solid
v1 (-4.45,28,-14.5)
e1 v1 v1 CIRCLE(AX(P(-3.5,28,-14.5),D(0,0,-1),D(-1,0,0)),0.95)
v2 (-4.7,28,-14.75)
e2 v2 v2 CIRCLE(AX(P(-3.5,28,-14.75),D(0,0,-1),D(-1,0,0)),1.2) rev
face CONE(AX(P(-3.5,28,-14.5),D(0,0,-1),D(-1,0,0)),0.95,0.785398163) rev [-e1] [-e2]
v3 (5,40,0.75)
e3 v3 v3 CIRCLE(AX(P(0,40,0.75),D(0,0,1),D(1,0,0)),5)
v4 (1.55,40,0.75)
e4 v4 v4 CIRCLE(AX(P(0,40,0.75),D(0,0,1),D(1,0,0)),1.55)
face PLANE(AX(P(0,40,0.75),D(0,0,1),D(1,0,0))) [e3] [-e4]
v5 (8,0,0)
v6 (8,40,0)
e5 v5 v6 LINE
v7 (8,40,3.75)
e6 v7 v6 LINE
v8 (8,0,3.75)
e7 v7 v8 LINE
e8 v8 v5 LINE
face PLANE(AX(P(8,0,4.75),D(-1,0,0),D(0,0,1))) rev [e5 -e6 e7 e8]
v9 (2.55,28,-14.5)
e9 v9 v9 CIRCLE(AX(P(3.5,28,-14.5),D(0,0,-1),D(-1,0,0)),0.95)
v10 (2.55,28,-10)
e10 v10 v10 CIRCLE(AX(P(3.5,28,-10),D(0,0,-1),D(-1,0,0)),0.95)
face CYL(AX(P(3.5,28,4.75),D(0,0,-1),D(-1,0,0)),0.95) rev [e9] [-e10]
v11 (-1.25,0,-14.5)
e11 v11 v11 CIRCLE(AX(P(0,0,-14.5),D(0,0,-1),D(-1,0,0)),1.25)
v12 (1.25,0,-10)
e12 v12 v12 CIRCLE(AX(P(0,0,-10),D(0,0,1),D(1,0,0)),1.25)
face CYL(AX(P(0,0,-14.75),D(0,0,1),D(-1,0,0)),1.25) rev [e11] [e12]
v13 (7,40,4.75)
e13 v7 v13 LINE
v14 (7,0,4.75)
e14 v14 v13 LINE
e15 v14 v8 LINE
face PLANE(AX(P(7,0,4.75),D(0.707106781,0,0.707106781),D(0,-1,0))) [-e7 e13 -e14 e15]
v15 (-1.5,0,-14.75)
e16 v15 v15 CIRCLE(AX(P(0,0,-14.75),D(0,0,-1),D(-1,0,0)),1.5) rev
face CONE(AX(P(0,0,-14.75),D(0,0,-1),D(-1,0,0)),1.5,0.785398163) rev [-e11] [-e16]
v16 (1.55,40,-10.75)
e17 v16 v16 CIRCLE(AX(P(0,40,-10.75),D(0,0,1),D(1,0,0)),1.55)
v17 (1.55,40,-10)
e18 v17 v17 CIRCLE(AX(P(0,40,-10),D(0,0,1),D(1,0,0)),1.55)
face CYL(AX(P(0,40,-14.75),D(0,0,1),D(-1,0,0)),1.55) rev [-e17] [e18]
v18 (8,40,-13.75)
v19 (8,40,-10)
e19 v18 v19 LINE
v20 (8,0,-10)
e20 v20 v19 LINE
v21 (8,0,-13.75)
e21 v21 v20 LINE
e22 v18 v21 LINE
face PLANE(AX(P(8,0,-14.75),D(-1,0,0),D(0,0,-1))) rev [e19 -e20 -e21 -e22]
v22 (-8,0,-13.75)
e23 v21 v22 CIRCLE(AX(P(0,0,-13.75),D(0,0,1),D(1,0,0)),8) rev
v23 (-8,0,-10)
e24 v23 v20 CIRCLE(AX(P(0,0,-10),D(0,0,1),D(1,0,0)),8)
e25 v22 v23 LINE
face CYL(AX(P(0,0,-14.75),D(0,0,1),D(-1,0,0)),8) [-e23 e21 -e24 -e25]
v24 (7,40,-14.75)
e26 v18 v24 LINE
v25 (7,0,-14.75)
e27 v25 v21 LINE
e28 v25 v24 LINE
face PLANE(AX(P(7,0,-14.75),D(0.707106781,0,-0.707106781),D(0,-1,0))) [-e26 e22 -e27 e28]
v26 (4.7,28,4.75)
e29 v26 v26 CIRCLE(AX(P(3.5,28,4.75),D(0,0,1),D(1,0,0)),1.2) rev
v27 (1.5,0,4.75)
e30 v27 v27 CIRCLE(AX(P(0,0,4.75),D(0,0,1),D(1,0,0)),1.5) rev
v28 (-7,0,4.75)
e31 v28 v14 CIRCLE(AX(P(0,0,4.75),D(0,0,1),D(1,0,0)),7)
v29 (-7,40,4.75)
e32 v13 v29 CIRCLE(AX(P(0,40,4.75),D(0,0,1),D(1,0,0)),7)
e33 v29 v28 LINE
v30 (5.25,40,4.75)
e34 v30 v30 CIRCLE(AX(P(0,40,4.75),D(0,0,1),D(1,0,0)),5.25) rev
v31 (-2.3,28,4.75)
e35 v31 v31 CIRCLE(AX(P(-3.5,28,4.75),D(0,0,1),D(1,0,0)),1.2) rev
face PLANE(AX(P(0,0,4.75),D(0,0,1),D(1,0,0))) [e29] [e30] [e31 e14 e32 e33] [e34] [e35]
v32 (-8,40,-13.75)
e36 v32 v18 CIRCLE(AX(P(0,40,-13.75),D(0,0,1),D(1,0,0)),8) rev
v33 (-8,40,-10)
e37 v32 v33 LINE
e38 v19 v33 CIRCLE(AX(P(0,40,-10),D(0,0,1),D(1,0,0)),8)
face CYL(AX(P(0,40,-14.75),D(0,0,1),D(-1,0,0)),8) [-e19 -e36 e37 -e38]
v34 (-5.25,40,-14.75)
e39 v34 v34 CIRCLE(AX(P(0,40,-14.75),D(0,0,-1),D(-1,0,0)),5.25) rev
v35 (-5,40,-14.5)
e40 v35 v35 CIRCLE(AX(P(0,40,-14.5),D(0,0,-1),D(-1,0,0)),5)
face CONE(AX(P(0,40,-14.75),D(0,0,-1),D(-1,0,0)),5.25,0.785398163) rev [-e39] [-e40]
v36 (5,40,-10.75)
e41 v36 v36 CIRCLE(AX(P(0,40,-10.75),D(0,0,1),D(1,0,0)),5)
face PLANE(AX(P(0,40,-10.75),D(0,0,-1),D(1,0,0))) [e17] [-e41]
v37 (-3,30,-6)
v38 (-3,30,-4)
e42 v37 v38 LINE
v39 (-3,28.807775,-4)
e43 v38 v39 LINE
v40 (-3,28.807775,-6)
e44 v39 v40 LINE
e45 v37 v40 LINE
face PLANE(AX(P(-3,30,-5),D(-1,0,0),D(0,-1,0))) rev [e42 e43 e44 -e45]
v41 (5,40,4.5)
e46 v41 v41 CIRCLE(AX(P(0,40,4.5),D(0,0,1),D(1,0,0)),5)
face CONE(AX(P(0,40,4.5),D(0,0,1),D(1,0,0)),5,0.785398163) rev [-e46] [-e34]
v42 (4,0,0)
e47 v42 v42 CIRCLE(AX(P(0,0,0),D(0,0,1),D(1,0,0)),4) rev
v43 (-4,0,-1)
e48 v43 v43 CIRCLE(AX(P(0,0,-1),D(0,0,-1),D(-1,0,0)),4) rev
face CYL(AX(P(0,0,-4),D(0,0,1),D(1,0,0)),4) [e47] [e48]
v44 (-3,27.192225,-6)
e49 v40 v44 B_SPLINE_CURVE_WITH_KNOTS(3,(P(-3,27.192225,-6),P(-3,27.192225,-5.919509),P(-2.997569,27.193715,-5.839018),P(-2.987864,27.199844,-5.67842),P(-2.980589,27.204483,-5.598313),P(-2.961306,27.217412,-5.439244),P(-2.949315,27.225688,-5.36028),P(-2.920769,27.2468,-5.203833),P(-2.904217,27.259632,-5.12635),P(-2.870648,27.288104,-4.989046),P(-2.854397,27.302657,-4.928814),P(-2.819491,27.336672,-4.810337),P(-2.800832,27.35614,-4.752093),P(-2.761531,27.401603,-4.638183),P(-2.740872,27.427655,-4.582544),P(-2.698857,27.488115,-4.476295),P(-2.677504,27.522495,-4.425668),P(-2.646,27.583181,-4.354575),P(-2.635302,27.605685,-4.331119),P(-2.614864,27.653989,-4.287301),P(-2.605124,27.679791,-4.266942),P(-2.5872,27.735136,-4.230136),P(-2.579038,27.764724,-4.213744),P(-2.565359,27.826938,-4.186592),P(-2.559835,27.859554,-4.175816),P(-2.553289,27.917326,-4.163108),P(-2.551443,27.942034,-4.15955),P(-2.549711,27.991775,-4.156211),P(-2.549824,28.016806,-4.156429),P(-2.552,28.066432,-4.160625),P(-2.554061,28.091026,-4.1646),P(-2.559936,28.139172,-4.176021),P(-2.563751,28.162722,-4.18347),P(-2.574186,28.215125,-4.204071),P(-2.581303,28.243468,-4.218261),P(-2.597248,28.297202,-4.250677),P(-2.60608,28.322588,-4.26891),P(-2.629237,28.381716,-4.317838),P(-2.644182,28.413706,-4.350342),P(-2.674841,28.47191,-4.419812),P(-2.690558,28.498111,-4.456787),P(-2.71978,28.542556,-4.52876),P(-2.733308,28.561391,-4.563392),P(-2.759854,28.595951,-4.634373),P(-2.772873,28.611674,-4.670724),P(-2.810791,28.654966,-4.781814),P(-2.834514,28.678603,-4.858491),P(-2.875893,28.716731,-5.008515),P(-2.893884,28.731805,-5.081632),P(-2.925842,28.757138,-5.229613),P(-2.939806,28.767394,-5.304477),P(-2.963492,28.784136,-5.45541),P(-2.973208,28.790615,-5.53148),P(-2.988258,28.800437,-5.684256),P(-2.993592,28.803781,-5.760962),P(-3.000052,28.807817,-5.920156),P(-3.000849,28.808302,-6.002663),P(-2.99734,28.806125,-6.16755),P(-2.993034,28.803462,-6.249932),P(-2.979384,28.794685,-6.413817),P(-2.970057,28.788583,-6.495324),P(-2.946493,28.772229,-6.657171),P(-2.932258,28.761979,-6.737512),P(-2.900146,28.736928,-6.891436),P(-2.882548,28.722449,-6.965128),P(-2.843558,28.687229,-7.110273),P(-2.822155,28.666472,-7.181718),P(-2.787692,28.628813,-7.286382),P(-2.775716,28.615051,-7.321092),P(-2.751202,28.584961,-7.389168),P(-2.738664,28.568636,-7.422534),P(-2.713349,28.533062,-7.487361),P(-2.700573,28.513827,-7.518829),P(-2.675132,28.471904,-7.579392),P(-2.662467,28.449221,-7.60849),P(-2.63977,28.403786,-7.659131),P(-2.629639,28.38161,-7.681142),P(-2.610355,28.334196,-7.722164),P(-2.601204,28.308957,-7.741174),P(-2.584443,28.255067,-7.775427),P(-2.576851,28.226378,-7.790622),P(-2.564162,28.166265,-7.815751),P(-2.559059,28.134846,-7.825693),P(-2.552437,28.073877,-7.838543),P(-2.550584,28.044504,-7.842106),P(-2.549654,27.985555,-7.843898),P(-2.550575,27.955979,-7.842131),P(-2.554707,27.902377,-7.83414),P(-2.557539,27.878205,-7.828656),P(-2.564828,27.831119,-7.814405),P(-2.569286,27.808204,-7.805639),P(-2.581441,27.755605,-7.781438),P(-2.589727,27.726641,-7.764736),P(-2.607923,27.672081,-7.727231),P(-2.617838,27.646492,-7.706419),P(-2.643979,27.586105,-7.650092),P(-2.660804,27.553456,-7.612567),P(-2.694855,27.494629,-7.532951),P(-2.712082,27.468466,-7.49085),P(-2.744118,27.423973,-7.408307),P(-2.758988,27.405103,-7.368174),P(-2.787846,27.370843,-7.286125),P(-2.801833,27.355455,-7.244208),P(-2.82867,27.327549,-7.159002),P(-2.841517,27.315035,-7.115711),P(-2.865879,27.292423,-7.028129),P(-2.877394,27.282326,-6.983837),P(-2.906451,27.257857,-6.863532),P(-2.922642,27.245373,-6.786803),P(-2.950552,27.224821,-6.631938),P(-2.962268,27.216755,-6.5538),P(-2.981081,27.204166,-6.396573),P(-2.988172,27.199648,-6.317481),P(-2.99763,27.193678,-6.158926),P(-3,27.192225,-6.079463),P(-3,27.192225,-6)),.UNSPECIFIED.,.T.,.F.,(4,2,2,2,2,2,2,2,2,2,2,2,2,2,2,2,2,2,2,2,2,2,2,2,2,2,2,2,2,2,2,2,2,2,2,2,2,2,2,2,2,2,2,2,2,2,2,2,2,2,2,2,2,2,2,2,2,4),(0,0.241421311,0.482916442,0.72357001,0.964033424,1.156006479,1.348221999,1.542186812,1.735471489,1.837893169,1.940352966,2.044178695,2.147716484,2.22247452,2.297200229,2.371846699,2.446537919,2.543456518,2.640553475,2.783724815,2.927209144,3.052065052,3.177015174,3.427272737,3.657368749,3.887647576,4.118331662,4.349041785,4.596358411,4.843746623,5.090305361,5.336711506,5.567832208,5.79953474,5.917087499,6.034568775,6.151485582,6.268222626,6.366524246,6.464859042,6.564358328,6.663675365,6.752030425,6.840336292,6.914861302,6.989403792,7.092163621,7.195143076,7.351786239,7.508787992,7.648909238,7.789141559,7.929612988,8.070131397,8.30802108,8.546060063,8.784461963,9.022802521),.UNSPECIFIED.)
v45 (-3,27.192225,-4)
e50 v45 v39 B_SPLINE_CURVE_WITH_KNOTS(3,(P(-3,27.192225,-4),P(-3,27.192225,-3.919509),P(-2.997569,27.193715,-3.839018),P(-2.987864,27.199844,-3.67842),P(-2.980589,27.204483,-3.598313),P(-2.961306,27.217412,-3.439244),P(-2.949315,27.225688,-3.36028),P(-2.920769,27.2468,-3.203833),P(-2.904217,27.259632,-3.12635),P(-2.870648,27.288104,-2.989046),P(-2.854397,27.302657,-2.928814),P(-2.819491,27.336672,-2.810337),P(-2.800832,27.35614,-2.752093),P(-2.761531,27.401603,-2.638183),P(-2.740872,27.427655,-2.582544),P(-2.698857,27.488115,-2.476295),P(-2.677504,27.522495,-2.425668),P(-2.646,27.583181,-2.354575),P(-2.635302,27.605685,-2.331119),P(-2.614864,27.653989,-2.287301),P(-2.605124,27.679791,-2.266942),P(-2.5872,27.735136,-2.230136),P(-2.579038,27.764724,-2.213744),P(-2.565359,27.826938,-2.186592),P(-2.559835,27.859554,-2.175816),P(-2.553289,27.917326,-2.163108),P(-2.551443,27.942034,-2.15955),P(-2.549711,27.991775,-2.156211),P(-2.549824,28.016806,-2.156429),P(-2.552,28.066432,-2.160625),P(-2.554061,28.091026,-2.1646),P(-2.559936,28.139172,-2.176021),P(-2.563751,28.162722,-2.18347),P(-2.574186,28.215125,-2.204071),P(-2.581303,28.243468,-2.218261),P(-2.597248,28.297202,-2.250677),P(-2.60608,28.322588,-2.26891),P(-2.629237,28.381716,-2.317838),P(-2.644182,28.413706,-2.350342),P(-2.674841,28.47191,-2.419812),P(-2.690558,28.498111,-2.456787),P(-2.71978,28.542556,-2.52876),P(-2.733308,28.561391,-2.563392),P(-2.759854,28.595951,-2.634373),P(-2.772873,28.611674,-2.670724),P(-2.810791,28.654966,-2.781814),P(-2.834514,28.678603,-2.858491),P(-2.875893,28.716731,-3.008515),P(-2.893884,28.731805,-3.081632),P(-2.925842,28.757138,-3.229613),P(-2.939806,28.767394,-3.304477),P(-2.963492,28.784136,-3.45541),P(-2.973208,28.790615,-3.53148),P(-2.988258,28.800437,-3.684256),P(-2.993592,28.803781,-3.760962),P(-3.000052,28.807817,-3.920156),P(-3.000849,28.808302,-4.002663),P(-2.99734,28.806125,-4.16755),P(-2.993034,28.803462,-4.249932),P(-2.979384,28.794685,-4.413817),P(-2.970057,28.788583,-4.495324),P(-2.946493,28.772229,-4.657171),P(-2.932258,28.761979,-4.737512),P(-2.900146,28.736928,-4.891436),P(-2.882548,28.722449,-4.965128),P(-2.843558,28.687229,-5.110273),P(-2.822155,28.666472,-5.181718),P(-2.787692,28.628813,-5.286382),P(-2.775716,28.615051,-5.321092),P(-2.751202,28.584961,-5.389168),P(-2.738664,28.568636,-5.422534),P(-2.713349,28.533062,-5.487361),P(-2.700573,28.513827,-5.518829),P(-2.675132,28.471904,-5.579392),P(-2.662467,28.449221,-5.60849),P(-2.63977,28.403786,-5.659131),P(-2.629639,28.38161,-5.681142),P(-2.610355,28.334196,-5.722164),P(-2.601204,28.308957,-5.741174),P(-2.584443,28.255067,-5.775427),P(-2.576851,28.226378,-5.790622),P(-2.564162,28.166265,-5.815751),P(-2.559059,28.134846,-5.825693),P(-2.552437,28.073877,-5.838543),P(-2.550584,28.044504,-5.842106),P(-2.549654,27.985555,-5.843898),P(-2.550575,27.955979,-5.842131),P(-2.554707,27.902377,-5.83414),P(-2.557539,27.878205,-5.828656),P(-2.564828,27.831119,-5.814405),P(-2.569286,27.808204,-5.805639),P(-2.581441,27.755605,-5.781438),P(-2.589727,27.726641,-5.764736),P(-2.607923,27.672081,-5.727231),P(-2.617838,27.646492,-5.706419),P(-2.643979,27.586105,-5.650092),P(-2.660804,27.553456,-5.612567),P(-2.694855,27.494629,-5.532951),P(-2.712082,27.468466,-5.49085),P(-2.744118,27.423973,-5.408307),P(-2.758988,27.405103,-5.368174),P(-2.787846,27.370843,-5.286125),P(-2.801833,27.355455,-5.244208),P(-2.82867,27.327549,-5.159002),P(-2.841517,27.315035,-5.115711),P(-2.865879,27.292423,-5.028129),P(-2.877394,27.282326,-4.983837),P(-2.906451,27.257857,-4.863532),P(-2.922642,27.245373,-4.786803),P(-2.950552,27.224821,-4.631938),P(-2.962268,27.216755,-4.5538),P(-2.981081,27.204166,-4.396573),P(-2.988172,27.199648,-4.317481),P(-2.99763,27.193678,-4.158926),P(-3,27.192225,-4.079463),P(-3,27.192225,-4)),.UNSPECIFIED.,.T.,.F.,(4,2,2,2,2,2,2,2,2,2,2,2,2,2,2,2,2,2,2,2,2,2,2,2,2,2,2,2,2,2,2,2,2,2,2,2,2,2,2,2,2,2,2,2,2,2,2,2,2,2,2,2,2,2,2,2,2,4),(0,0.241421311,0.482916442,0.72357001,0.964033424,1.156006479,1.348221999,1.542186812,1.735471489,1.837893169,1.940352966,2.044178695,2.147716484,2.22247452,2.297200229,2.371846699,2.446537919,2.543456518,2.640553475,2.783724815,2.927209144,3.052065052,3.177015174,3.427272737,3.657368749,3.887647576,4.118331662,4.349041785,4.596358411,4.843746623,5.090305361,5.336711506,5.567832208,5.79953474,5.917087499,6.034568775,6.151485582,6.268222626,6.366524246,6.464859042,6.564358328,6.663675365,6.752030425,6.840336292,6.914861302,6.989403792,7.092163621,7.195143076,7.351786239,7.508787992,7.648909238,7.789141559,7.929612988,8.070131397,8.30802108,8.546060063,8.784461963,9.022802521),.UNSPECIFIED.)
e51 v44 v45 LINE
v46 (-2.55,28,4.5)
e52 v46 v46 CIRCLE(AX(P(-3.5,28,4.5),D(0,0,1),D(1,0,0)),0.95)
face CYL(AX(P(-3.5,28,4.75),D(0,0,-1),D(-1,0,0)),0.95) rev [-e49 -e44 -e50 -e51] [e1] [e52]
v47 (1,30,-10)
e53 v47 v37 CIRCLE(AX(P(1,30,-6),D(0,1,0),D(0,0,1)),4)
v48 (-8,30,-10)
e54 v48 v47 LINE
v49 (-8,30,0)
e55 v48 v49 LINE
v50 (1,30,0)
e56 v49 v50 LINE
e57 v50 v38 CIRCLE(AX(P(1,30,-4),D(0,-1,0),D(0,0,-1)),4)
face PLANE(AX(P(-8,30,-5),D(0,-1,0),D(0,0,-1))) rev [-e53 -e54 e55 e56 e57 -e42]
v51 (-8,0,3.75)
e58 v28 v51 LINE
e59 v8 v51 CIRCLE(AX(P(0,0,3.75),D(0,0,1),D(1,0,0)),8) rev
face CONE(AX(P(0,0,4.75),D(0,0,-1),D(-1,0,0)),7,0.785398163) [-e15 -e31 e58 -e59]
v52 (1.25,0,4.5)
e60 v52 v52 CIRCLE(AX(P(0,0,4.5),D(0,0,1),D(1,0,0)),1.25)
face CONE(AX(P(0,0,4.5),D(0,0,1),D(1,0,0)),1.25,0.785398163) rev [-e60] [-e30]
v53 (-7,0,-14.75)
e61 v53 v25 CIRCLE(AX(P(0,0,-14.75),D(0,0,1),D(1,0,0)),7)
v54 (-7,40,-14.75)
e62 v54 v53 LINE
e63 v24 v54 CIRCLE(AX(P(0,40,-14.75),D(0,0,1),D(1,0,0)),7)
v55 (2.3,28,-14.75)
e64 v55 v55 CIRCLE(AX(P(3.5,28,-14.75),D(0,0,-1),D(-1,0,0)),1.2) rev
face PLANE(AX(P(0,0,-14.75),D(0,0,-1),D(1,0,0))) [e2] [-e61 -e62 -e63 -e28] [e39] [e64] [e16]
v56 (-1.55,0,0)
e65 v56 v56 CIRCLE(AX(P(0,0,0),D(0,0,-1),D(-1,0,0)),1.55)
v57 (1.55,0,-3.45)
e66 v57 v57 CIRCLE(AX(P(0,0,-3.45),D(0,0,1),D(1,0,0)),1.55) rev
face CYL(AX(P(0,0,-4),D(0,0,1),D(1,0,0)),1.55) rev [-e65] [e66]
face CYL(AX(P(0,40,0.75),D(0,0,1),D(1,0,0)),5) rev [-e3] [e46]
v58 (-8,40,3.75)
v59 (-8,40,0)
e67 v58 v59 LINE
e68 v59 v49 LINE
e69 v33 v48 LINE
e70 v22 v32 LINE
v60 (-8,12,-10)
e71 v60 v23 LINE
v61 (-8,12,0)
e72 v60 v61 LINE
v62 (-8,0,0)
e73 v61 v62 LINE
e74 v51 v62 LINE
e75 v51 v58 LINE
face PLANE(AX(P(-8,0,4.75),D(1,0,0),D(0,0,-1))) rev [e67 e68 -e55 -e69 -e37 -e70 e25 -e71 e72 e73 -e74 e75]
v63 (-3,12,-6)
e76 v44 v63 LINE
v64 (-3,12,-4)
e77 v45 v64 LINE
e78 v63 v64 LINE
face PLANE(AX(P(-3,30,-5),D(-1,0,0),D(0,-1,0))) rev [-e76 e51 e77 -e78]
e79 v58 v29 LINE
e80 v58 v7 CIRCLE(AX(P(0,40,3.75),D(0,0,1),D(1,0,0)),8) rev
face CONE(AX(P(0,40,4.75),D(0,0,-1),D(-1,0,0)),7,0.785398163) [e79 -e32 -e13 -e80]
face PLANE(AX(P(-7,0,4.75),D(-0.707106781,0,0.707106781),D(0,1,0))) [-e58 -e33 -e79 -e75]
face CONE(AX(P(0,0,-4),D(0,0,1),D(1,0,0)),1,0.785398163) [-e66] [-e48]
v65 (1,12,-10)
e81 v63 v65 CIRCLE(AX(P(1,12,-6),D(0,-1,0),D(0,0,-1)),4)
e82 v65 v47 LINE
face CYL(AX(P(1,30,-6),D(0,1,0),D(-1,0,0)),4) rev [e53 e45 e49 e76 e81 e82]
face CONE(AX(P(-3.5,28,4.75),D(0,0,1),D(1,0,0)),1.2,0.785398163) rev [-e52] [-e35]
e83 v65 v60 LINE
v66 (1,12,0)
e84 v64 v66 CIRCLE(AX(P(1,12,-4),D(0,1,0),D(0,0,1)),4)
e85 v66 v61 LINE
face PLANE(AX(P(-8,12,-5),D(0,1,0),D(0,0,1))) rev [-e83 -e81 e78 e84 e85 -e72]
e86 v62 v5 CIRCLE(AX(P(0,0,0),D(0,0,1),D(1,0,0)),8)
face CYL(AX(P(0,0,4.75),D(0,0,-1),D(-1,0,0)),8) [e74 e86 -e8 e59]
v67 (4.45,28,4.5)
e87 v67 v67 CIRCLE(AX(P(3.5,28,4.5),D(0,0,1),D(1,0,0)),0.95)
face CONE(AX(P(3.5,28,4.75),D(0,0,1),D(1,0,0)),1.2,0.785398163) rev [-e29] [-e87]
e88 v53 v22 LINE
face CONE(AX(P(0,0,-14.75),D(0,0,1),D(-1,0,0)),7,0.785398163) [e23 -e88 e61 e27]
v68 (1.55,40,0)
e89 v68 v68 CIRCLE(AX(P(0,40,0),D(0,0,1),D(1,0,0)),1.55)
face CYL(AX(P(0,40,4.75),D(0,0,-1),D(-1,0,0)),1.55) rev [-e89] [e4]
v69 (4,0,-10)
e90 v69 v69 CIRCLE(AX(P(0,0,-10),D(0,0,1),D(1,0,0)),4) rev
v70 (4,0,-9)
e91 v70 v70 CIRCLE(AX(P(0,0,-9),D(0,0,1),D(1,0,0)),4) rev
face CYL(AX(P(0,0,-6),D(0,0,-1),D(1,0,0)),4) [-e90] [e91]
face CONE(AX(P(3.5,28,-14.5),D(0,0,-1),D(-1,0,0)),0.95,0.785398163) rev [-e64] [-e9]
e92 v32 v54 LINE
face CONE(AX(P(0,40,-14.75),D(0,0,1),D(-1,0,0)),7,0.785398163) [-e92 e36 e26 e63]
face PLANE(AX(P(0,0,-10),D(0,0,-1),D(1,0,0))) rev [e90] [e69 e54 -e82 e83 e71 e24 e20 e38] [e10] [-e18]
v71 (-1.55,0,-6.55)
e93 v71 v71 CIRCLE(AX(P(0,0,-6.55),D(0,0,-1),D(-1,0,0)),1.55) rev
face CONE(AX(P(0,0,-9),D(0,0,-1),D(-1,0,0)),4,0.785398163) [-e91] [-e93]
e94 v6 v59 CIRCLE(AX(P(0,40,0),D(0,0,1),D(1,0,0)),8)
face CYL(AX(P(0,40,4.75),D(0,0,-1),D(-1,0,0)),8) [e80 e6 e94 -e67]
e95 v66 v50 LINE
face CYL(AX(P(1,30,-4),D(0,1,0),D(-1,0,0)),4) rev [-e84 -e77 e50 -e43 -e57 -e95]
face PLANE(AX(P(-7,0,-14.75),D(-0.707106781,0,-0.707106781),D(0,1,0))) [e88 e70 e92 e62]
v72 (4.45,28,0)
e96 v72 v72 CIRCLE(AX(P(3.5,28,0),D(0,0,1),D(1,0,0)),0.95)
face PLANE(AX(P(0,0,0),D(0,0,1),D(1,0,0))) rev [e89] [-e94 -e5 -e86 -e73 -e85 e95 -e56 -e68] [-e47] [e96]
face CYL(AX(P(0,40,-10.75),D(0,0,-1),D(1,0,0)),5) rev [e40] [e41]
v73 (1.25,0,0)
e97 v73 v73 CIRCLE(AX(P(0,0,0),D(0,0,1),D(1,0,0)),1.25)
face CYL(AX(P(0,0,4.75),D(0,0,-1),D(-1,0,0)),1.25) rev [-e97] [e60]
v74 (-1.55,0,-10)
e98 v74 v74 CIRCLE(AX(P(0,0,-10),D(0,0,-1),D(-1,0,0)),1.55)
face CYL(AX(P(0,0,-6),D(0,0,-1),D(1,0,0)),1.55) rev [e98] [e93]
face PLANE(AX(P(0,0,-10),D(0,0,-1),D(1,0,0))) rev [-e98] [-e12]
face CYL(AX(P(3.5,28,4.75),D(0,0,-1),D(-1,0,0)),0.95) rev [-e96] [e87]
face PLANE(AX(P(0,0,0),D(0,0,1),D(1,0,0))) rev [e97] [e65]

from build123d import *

# Parameters (mm, degrees)
SKETCH1_R           = 1.55
SKETCH1_R_2         = 1.25
BOSS_EXTRUDE1_DEPTH = 4.75
FILLET2_SIZE        = 1
SKETCH2_R           = 5
CUT_EXTRUDE1_DEPTH  = 4
SKETCH3_W           = 5
SKETCH3_H           = 18
BOSS_EXTRUDE2_DEPTH = 5
SKETCH8_R           = 4
SKETCH8_R_2         = 1.55
BOSS_EXTRUDE4_DEPTH = 4
FILLET3_R           = 4
SKETCH7_R           = 0.95
CUT_EXTRUDE3_DEPTH  = 53.423754158
CHAFL_N1_SIZE       = 0.25
CHAFL_N2_SIZE       = 3


with BuildPart() as part:
    # Sketch1 → Boss-Extrude1 (new body)
    with BuildSketch(Plane.XY):
        with BuildLine():
            Line((-8, 0), (-8, 40))
            ThreePointArc((-8, 40), (0, 48), (8, 40))
            Line((8, 40), (8, 0))
            ThreePointArc((8, 0), (0, -8), (-8, 0))
        make_face()
        with Locations((0, 40)):
            Circle(SKETCH1_R, mode=Mode.SUBTRACT)
        Circle(SKETCH1_R_2, mode=Mode.SUBTRACT)
    extrude(amount=BOSS_EXTRUDE1_DEPTH)

    # Fillet2
    fillet2_edges = [part.edges().sort_by_distance(p)[0] for p in [
        (0, 48, 4.75),
        (-8, 20, 4.75),
        (0, -8, 4.75),
        (8, 20, 4.75),
    ]]
    chamfer(fillet2_edges, length=FILLET2_SIZE)

    # Sketch2 → Cut-Extrude1 (cut)
    with BuildSketch(Plane.XY.offset(4.75)):
        with Locations((0, 40)):
            Circle(SKETCH2_R)
    extrude(amount=-CUT_EXTRUDE1_DEPTH, mode=Mode.SUBTRACT)

    # Sketch3 → Boss-Extrude2 (add)
    with BuildSketch(Plane(origin=(0, 0, 0), x_dir=(-1, 0, 0), z_dir=(0, 0, -1))):
        with Locations((5.5, 21)):
            Rectangle(SKETCH3_W, SKETCH3_H)
    extrude(amount=BOSS_EXTRUDE2_DEPTH)

    # Sketch8 → Boss-Extrude4 (add)
    with BuildSketch(Plane(origin=(0, 0, 0), x_dir=(-1, 0, 0), z_dir=(0, 0, -1))):
        with Locations(Location((0, 0, 0), (0, 0, 180))):
            Circle(SKETCH8_R)
        Circle(SKETCH8_R_2, mode=Mode.SUBTRACT)
    extrude(amount=BOSS_EXTRUDE4_DEPTH)

    # Fillet3
    fillet3_edges = [part.edges().sort_by_distance(p)[0] for p in [
        (-3, 21, 0),
    ]]
    fillet(fillet3_edges, radius=FILLET3_R)

    # Mirror5: part across plane


with BuildPart() as part_1:
    add(part.part)
    add(part.part.mirror(Plane.XY.offset(-5)))

    # Sketch7 → Cut-Extrude3 (cut, through all)
    with BuildSketch(Plane(origin=(0, 0, -14.75), x_dir=(-1, 0, 0), z_dir=(0, 0, -1))):
        with Locations((-3.5, 28)):
            Circle(SKETCH7_R)
        with Locations(Location((3.5, 28, 0), (0, 0, 180))):
            Circle(SKETCH7_R)
    extrude(amount=-CUT_EXTRUDE3_DEPTH, mode=Mode.SUBTRACT)

    # Chaflán1
    chafl_n1_edges = [part_1.edges().sort_by_distance(p)[0] for p in [
        (4.45, 28, 4.75),
        (4.45, 28, -14.75),
        (-4.45, 28, 4.75),
        (-4.45, 28, -14.75),
        (-1.25, 0, 4.75),
        (-5, 40, 4.75),
        (-5, 40, -14.75),
        (-1.25, 0, -14.75),
    ]]
    chamfer(chafl_n1_edges, length=CHAFL_N1_SIZE)

    # Chaflán2
    # the kernel refuses this chamfer: 3 mm, written as the material it takes off along each edge
    with BuildSketch(Plane(origin=(0, 0, -6), x_dir=(1, 0, 0), z_dir=(0, 1, 0))) as chafl_n2_piece_1:
        Polygon((4, CHAFL_N2_SIZE), (4 - CHAFL_N2_SIZE, 0), (4, 0), align=None)
    revolve(axis=Axis((0, 0, -6), (0, 0, -1)), mode=Mode.SUBTRACT)
    with BuildSketch(Plane(origin=(0, 0, -4), x_dir=(1, 0, 0), z_dir=(0, 1, 0))) as chafl_n2_piece_2:
        Polygon((4, -CHAFL_N2_SIZE), (4 - CHAFL_N2_SIZE, 0), (4, 0), align=None)
    revolve(axis=Axis((0, 0, -4), (0, 0, -1)), mode=Mode.SUBTRACT)


solid = part_1.part
